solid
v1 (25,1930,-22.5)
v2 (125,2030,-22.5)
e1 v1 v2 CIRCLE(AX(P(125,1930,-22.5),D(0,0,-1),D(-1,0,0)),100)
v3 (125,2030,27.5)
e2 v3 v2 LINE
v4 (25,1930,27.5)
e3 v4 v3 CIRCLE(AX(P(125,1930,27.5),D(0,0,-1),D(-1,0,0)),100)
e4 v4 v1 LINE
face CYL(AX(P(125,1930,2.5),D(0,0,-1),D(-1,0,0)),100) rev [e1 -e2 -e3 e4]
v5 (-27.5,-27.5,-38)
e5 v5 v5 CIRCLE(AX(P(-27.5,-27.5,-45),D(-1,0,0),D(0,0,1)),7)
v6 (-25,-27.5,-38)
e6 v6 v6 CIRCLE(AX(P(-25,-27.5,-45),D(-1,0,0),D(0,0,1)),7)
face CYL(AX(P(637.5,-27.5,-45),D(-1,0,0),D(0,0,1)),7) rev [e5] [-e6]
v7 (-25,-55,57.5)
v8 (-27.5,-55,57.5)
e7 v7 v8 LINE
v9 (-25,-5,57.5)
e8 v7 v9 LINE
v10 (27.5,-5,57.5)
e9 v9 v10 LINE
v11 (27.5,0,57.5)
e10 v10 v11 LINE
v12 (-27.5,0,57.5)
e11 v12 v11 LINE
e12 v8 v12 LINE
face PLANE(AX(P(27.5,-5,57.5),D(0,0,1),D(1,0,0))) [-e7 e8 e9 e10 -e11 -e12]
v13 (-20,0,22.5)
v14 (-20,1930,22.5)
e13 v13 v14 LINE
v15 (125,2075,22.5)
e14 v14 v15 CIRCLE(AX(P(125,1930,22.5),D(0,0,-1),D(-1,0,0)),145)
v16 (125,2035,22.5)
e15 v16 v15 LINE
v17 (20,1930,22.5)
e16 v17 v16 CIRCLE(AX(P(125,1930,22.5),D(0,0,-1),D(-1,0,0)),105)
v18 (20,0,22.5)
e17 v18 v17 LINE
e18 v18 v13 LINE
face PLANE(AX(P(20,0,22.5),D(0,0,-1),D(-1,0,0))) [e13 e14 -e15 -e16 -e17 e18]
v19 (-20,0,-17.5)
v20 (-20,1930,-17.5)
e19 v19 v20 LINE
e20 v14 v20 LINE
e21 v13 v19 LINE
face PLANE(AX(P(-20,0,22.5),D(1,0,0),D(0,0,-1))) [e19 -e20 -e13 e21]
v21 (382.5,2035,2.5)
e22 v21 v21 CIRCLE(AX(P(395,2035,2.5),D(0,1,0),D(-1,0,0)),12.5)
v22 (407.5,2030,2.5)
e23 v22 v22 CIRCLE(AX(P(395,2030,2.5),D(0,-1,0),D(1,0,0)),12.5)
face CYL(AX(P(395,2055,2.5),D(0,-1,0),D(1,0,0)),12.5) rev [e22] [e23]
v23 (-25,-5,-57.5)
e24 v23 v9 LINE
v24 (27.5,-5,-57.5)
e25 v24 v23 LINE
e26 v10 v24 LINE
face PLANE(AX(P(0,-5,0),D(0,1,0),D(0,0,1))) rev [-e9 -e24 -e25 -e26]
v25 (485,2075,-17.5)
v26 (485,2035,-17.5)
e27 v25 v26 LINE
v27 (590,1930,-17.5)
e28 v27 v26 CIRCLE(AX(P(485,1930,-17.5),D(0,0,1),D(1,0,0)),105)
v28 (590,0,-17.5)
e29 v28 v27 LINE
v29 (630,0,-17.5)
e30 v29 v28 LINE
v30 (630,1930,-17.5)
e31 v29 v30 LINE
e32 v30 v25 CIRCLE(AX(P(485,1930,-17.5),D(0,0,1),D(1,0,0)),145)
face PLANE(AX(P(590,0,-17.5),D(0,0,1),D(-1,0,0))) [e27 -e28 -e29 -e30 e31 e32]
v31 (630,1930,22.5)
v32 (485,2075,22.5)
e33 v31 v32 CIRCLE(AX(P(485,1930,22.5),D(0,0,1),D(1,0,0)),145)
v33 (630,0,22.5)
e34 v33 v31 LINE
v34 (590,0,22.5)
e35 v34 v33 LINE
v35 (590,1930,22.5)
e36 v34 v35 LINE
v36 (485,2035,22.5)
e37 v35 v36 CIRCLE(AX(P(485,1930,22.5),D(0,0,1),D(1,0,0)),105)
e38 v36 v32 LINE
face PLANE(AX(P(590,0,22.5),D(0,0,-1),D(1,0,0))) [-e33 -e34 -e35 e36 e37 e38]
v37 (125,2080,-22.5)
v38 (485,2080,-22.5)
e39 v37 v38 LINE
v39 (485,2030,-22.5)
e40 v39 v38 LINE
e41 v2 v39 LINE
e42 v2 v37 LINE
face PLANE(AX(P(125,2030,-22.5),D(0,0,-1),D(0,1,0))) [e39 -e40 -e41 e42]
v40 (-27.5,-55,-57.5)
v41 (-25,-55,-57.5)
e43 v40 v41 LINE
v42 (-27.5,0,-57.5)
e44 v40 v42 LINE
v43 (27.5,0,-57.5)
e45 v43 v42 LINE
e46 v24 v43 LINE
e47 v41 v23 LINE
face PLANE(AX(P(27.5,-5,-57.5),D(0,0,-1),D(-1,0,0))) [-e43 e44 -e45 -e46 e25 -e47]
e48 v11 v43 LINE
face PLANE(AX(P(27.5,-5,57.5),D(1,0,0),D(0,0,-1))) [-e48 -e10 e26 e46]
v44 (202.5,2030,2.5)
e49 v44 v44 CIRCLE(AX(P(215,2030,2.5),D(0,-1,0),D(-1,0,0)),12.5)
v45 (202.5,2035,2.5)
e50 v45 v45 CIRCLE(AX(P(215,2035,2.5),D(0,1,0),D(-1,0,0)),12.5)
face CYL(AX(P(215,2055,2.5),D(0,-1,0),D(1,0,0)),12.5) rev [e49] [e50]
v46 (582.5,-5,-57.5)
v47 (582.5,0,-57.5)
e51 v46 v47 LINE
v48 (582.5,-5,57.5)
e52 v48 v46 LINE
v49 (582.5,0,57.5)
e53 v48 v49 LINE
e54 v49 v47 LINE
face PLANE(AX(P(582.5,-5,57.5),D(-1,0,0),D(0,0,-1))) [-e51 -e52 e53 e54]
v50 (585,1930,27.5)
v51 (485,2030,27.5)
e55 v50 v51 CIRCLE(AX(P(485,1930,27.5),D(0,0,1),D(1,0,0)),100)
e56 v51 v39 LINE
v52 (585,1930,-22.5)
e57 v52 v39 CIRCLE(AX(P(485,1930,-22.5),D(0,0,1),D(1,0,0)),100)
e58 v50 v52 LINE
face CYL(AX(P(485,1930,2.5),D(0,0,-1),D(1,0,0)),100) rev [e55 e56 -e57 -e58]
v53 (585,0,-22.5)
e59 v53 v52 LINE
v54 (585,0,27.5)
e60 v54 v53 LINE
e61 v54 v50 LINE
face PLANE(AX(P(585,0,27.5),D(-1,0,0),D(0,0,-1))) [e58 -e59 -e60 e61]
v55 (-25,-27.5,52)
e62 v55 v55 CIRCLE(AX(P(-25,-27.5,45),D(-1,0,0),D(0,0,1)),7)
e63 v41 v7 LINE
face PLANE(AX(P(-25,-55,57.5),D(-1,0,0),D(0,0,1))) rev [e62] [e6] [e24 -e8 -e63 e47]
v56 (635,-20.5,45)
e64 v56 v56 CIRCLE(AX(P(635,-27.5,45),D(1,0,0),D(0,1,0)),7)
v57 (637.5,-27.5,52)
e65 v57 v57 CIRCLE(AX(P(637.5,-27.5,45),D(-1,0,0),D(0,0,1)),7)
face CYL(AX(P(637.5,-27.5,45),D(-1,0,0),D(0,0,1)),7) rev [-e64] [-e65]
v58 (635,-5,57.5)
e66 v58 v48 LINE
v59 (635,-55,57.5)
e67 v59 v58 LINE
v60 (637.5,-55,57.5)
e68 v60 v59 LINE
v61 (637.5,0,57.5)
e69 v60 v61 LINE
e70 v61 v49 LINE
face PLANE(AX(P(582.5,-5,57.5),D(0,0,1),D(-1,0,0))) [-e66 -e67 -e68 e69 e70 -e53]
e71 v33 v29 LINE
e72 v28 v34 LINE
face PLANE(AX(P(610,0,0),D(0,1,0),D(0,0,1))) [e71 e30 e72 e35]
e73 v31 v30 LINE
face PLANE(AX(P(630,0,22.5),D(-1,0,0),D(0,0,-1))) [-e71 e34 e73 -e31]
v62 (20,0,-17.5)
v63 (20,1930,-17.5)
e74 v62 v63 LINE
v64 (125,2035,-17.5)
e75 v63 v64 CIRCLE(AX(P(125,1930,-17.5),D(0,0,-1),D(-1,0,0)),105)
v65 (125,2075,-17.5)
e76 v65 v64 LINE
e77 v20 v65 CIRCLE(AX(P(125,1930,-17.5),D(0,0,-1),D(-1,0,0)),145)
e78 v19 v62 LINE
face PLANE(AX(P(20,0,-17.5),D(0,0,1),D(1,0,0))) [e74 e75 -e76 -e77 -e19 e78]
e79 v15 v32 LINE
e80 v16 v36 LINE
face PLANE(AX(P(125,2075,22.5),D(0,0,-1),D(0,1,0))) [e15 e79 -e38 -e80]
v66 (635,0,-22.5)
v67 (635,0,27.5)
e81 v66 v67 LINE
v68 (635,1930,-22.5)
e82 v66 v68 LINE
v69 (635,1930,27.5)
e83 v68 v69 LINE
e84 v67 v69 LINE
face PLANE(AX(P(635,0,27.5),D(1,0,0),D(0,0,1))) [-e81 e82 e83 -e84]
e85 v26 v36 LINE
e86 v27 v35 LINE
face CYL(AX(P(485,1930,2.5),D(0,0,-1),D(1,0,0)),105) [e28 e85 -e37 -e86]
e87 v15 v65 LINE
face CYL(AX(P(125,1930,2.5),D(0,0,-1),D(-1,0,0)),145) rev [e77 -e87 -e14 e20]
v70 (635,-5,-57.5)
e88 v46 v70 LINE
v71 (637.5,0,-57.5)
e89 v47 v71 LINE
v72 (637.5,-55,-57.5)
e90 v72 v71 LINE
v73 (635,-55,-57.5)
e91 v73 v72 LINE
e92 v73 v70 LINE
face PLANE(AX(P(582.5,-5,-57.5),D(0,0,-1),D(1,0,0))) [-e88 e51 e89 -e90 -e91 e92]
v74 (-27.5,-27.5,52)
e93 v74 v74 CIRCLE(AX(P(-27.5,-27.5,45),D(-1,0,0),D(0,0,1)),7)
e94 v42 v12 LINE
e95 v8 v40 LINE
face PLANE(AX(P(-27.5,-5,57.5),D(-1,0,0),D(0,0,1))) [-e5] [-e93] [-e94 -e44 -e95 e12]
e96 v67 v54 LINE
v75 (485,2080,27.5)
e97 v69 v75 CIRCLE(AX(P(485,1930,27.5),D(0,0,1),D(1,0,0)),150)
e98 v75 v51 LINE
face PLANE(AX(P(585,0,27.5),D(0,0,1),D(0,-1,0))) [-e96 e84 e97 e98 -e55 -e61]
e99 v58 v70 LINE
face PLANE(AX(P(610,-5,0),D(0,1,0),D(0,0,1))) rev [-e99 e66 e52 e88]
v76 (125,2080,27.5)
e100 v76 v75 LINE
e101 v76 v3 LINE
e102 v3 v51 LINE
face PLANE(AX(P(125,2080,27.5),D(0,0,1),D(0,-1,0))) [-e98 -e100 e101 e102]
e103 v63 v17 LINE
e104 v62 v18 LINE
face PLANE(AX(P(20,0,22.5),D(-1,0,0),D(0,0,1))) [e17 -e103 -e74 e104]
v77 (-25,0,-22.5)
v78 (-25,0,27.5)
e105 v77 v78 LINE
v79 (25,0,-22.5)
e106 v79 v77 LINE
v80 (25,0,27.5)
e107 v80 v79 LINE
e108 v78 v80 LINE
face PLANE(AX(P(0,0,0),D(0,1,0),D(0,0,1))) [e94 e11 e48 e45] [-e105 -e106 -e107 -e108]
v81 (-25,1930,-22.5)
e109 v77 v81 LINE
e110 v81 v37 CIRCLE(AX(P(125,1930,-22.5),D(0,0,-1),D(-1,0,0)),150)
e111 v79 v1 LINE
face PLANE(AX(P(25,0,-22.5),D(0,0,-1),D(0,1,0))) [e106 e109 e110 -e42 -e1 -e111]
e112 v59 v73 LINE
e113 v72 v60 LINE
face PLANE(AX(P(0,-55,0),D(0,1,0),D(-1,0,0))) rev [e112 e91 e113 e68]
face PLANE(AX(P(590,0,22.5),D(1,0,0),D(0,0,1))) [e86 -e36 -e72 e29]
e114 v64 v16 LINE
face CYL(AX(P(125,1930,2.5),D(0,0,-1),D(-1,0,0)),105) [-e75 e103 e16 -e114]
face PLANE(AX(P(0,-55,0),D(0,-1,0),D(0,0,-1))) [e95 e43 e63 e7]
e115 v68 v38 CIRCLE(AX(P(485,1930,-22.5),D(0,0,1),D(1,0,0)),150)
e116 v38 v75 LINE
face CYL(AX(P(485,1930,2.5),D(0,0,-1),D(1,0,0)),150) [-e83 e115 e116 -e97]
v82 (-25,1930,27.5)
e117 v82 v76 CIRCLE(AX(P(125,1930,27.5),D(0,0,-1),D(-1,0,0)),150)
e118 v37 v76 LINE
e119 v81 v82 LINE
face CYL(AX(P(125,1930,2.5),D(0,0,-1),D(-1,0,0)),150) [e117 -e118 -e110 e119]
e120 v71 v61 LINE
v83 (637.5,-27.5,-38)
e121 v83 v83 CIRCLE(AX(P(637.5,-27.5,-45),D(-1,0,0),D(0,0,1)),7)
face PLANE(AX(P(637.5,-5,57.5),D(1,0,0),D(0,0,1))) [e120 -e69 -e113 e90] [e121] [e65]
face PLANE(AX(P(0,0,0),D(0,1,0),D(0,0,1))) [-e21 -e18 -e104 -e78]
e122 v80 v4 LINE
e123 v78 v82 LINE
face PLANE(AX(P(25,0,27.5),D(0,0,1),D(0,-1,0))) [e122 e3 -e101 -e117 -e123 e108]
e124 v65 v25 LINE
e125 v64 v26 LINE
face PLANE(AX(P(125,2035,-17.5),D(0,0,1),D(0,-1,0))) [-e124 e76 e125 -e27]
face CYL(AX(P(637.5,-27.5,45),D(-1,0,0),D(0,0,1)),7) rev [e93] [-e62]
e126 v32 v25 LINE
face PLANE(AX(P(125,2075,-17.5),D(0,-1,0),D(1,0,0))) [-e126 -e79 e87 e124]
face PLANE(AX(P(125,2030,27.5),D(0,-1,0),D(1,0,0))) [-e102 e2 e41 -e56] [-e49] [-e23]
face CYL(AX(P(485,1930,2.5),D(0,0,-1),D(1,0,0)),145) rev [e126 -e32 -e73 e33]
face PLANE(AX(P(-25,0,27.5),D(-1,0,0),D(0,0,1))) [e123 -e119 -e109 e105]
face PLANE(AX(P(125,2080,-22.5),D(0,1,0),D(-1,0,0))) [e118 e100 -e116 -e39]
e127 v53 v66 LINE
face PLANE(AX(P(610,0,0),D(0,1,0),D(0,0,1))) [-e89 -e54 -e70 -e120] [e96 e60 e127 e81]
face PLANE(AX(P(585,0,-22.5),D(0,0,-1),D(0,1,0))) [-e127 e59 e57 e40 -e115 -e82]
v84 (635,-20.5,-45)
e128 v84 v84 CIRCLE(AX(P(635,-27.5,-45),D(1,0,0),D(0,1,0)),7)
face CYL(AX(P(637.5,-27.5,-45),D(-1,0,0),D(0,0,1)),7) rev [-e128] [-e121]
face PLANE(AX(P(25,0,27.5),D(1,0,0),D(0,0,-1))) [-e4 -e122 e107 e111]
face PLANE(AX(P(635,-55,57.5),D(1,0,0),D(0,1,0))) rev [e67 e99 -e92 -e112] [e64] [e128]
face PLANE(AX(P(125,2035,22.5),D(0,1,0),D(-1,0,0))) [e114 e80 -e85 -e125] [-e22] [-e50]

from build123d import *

# Parameters (mm, degrees)
SKETCH2_W           = 55
SKETCH2_H           = 115
BOSS_EXTRUDE1_DEPTH = 5
SKETCH5_W           = 50
SKETCH5_H           = 50
SKETCH5_W_2         = 40
SKETCH5_H_2         = 40
SWEEP2_START        = -22.5
SWEEP2_DEPTH        = 50
SWEEP2_2_DEPTH      = 5
SWEEP2_START_2      = 22.5
SWEEP2_3_DEPTH      = 5
SKETCH11_R          = 12.5
CUT_EXTRUDE2_DEPTH  = 25
SKETCH12_R          = 12.5
CUT_EXTRUDE3_DEPTH  = 25
SKETCH13_W          = 2.5
SKETCH13_H          = 115
BOSS_EXTRUDE2_DEPTH = 50
SKETCH15_W          = 2.5
SKETCH15_H          = 115
BOSS_EXTRUDE3_DEPTH = 50
SKETCH14_R          = 7
CUT_EXTRUDE4_DEPTH  = 2185.475051357


# Read off the part's stored shape, not the designer's step: Sweep2
with BuildPart() as part:
    # Sketch2 → Boss-Extrude1 (new body)
    with BuildSketch(Plane(origin=(0, 0, 0), x_dir=(1, 0, 0), z_dir=(0, 1, 0))):
        Rectangle(SKETCH2_W, SKETCH2_H)
    extrude(amount=-BOSS_EXTRUDE1_DEPTH)

    # Sweep1: sweep along a path in Sketch7
    with BuildLine(Plane(origin=(0, 0, 0), x_dir=(0, 0, -1), z_dir=(1, 0, 0))) as sweep1_path:
        Line((-2.5, 0), (-2.5, 1930))
    # Sketch5 → Sweep1 (sweep)
    with BuildSketch(Plane(origin=(0, 0, 0), x_dir=(1, 0, 0), z_dir=(0, 1, 0))):
        with Locations((0, -2.5)):
            Rectangle(SKETCH5_W, SKETCH5_H)
        with Locations((0, -2.5)):
            Rectangle(SKETCH5_W_2, SKETCH5_H_2, mode=Mode.SUBTRACT)
    sweep(path=sweep1_path.line)

    # Sweep2 outline → Sweep2 (add)
    with BuildSketch(Plane.XY.offset(SWEEP2_START)):
        with BuildLine():
            ThreePointArc((125, 2080), (18.933982822, 2036.066017178), (-25, 1930))
            Line((-25, 1930), (-20, 1930))
            ThreePointArc((-20, 1930), (22.469516728, 2032.530483272), (125, 2075))
            Line((125, 2075), (305, 2075))
            Line((305, 2075), (305, 2080))
            Line((305, 2080), (125, 2080))
        make_face()
        with BuildLine():
            ThreePointArc((125, 2035), (50.753787975, 2004.246212025), (20, 1930))
            Line((20, 1930), (25, 1930))
            ThreePointArc((25, 1930), (54.289321881, 2000.710678119), (125, 2030))
            Line((125, 2030), (305, 2030))
            Line((305, 2030), (305, 2035))
            Line((305, 2035), (125, 2035))
        make_face()
    extrude(amount=SWEEP2_DEPTH)

    # Sweep2 2 outline → Sweep2 2 (add)
    with BuildSketch(Plane.XY.offset(SWEEP2_START)):
        with BuildLine():
            ThreePointArc((125, 2075), (22.469516728, 2032.530483272), (-20, 1930))
            Line((-20, 1930), (20, 1930))
            ThreePointArc((20, 1930), (50.753787975, 2004.246212025), (125, 2035))
            Line((125, 2035), (305, 2035))
            Line((305, 2035), (305, 2075))
            Line((305, 2075), (125, 2075))
        make_face()
    extrude(amount=SWEEP2_2_DEPTH)

    # Sweep2 3 outline → Sweep2 3 (add)
    with BuildSketch(Plane.XY.offset(SWEEP2_START_2)):
        with BuildLine():
            ThreePointArc((125, 2075), (22.469516728, 2032.530483272), (-20, 1930))
            Line((-20, 1930), (20, 1930))
            ThreePointArc((20, 1930), (50.753787975, 2004.246212025), (125, 2035))
            Line((125, 2035), (305, 2035))
            Line((305, 2035), (305, 2075))
            Line((305, 2075), (125, 2075))
        make_face()
    extrude(amount=SWEEP2_3_DEPTH)

    # Mirror1: part across plane


with BuildPart() as part_1:
    add(part.part)
    add(part.part.mirror(Plane(origin=(305, 2055, 0), x_dir=(0, 0, 1), z_dir=(1, 0, 0))))

    # Sketch11 → Cut-Extrude2 (cut)
    with BuildSketch(Plane.XZ.offset(-2030)):
        with Locations((395, 2.5)):
            Circle(SKETCH11_R)
    extrude(amount=-CUT_EXTRUDE2_DEPTH, mode=Mode.SUBTRACT)

    # Sketch12 → Cut-Extrude3 (cut)
    with BuildSketch(Plane.XZ.offset(-2030)):
        with Locations((395, 2.5)):
            Circle(SKETCH12_R)
        with Locations(Location((215, 2.5, 0), (0, 0, 180))):
            Circle(SKETCH12_R)
    extrude(amount=-CUT_EXTRUDE3_DEPTH, mode=Mode.SUBTRACT)

    # Sketch13 → Boss-Extrude2 (add)
    with BuildSketch(Plane.XZ.offset(5)):
        with Locations((-26.25, 0)):
            Rectangle(SKETCH13_W, SKETCH13_H)
    extrude(amount=BOSS_EXTRUDE2_DEPTH)

    # Sketch15 → Boss-Extrude3 (add)
    with BuildSketch(Plane.XZ.offset(5)):
        with Locations((636.25, 0)):
            Rectangle(SKETCH15_W, SKETCH15_H)
    extrude(amount=BOSS_EXTRUDE3_DEPTH)

    # Sketch14 → Cut-Extrude4 (cut, through all)
    with BuildSketch(Plane.ZY.offset(27.5)):
        with Locations((-45, -27.5)):
            Circle(SKETCH14_R)
        with Locations((45, -27.5)):
            Circle(SKETCH14_R)
    extrude(amount=-CUT_EXTRUDE4_DEPTH, mode=Mode.SUBTRACT)


solid = part_1.part
